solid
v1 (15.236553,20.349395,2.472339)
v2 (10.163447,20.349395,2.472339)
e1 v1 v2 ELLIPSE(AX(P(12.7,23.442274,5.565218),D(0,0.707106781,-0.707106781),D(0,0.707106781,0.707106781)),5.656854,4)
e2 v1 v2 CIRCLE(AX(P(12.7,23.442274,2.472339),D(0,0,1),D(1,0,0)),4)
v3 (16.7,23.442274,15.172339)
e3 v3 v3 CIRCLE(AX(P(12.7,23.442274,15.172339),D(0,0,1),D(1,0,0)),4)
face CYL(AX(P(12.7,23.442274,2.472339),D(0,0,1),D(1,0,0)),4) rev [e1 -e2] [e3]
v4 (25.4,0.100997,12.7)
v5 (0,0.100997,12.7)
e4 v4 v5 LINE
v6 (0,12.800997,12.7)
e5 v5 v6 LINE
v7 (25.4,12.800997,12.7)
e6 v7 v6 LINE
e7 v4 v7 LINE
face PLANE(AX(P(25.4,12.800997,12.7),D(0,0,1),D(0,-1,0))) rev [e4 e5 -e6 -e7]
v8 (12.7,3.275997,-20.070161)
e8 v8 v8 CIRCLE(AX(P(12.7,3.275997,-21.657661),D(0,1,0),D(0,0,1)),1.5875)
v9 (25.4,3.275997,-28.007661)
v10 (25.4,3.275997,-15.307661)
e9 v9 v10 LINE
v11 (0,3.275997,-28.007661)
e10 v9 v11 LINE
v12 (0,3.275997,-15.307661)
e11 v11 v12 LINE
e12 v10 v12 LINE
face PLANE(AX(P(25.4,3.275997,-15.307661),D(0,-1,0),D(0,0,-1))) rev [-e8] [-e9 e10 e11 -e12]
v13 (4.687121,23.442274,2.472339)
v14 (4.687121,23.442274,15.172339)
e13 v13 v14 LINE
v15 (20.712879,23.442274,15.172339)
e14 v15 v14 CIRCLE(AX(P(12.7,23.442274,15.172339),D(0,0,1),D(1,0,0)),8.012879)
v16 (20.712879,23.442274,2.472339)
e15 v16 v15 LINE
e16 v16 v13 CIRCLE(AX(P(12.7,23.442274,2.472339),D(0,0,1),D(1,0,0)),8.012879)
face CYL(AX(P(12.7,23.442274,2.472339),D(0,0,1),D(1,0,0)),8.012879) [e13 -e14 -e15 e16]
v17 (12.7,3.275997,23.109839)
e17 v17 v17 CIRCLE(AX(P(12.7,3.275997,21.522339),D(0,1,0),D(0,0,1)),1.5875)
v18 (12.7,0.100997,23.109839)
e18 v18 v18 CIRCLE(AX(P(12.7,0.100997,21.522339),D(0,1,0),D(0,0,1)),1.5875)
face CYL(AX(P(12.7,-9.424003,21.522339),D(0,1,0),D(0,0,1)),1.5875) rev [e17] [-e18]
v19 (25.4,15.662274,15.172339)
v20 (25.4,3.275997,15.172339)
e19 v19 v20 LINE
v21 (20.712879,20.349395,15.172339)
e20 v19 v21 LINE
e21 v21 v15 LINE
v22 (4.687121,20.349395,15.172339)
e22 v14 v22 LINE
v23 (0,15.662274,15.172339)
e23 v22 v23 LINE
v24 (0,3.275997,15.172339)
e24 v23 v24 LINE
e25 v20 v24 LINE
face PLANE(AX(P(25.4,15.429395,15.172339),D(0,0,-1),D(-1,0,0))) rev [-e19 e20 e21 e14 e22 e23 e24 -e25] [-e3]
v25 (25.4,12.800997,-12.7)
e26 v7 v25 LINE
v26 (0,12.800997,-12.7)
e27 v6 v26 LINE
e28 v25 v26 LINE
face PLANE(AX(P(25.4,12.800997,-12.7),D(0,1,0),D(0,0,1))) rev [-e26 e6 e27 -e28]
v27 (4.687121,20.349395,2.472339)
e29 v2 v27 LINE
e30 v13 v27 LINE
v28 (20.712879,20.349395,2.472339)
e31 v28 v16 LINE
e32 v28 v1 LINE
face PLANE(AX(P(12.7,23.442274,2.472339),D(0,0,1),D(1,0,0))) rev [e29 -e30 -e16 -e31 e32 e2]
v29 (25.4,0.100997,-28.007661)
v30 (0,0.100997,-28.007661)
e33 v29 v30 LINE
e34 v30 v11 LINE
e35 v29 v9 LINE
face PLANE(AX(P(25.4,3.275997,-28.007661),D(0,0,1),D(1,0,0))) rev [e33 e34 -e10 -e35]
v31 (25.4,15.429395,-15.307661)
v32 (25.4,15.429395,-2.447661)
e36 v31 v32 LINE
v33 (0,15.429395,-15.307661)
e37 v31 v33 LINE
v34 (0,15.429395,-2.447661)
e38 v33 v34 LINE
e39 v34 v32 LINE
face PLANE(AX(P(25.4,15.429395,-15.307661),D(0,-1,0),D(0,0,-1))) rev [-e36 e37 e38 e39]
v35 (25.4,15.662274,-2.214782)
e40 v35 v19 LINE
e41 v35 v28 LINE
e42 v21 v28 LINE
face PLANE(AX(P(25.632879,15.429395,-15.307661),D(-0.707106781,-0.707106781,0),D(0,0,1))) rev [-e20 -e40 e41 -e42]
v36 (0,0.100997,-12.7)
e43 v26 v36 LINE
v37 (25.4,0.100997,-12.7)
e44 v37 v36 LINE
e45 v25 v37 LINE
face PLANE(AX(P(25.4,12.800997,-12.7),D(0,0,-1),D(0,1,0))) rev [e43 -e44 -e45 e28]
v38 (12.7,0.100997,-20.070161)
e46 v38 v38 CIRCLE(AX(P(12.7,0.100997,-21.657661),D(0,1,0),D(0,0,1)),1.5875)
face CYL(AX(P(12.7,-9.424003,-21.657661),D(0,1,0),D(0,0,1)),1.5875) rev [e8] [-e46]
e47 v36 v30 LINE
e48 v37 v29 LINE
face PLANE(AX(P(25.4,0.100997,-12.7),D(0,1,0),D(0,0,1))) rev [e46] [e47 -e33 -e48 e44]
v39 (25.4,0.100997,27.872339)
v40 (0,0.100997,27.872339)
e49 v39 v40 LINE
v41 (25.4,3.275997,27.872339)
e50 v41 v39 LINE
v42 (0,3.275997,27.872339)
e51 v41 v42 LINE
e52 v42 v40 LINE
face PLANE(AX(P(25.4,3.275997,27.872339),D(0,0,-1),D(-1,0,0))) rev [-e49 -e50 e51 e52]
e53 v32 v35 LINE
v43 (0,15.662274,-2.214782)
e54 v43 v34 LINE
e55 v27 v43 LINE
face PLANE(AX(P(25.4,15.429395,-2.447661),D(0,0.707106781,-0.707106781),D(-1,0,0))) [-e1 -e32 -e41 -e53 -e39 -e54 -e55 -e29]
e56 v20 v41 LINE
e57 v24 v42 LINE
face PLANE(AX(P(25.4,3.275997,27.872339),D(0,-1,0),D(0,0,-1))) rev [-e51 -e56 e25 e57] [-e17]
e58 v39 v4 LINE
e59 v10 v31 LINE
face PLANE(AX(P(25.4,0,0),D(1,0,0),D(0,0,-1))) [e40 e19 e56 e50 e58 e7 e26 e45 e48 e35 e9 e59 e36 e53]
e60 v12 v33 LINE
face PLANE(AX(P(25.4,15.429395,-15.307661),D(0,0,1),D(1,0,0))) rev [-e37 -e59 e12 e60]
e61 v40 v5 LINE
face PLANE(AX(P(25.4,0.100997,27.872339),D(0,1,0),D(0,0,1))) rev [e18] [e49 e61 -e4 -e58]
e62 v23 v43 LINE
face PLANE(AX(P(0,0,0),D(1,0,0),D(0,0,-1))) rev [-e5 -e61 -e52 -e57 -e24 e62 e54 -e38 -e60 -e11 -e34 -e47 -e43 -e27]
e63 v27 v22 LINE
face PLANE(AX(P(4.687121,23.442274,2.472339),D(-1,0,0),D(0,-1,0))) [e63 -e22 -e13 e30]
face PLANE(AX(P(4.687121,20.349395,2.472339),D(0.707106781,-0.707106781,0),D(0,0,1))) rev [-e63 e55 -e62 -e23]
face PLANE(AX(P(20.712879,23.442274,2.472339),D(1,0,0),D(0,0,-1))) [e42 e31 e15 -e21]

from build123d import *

# Parameters (mm, degrees)
BOSS_EXTRUDE1_DEPTH = 25.4
SKETCH2_R           = 4
BOSS_EXTRUDE2_DEPTH = 12.7
CHAMFER1_SIZE       = 4.92
CHAMFER2_SIZE       = 4.92
SKETCH3_R           = 1.5875
CUT_EXTRUDE1_DEPTH  = 12.7


with BuildPart() as part:
    # Sketch1 → Boss-Extrude1 (new body)
    with BuildSketch(Plane(origin=(0, 0, 0), x_dir=(0, 0, -1), z_dir=(1, 0, 0))):
        Polygon((12.7, 12.800996681), (-12.7, 12.800996681), (-12.7, 0.100996681), (-27.872338694, 0.100996681), (-27.872338694, 3.275996681), (-15.172338694, 3.275996681), (-15.172338694, 15.4293954), (15.307661306, 15.4293954), (15.307661306, 3.275996681), (28.007661306, 3.275996681), (28.007661306, 0.100996681), (12.7, 0.100996681), align=None)
    extrude(amount=BOSS_EXTRUDE1_DEPTH)

    # Sketch2 → Boss-Extrude2 (add)
    with BuildSketch(Plane.XY.offset(15.172338694)):
        with BuildLine():
            Line((4.687120924, 23.442274476), (4.687120924, 15.4293954))
            Line((4.687120924, 15.4293954), (20.712879076, 15.4293954))
            Line((20.712879076, 15.4293954), (20.712879076, 23.442274476))
            ThreePointArc((20.712879076, 23.442274476), (12.7, 31.455153552), (4.687120924, 23.442274476))
        make_face()
        with Locations((12.7, 23.442274476)):
            Circle(SKETCH2_R, mode=Mode.SUBTRACT)
    extrude(amount=-BOSS_EXTRUDE2_DEPTH)

    # Chamfer1
    # the kernel refuses this chamfer: 4.92 mm, written as the material it adds along each edge
    with BuildSketch(Plane(origin=(4.687120924, 15.4293954, 15.172338694), x_dir=(-0.9996219169112966, -0.027495876610586726, 0), z_dir=(0, 0, -1))) as chamfer1_piece_1_section:
        Polygon((CHAMFER1_SIZE * 0.999621916911, CHAMFER1_SIZE * 0.0274958766106), (-CHAMFER1_SIZE * 0.0274958766106, CHAMFER1_SIZE * 0.999621916911), (0, 0), align=None)
    chamfer1_piece_1 = extrude(amount=12.7, mode=Mode.PRIVATE)
    chamfer1_piece_1 = split(chamfer1_piece_1, bisect_by=Plane(origin=(0, 17.064795435, 8.822338694), z_dir=(1, 0, 0)), keep=Keep.TOP, mode=Mode.PRIVATE)
    add(chamfer1_piece_1)
    with BuildSketch(Plane(origin=(20.712879076, 15.4293954, 15.172338694), x_dir=(0.9996219169112966, -0.02749587661058674, 0), z_dir=(0, 0, -1))) as chamfer1_piece_2_section:
        Polygon((CHAMFER1_SIZE * 0.999621916911, -CHAMFER1_SIZE * 0.0274958766106), (-CHAMFER1_SIZE * 0.0274958766106, -CHAMFER1_SIZE * 0.999621916911), (0, 0), align=None)
    chamfer1_piece_2 = extrude(amount=12.7, mode=Mode.PRIVATE)
    chamfer1_piece_2 = split(chamfer1_piece_2, bisect_by=Plane(origin=(25.4, 17.064795435, 8.822338694), z_dir=(-1, 0, 0)), keep=Keep.TOP, mode=Mode.PRIVATE)
    add(chamfer1_piece_2)

    # Chamfer2
    # the kernel refuses this chamfer: 4.92 mm, written as the material it adds along each edge
    with BuildSketch(Plane(origin=(25.4, 15.4293954, 2.472338694), x_dir=(0, -0.02749587661026744, -0.9996219169113054), z_dir=(-1, 0, 0))) as chamfer2_piece_1_section:
        Polygon((CHAMFER2_SIZE * 0.999621916911, -CHAMFER2_SIZE * 0.0274958766106), (-CHAMFER2_SIZE * 0.0274958766103, -CHAMFER2_SIZE * 0.999621916911), (0, 0), align=None)
    chamfer2_piece_1 = extrude(amount=25.4, mode=Mode.PRIVATE)
    chamfer2_piece_1 = split(chamfer2_piece_1, bisect_by=Plane(origin=(23.520525821, 17.541748655, 0.607229555), z_dir=(-0.7071067811868302, -0.7071067811862649, 0)), keep=Keep.TOP, mode=Mode.PRIVATE)
    chamfer2_piece_1 = split(chamfer2_piece_1, bisect_by=Plane(origin=(20.712879076, 16.594460185, 0.607229555), z_dir=(1, 0, 0)), keep=Keep.TOP, mode=Mode.PRIVATE)
    add(chamfer2_piece_1)
    with BuildSketch(Plane(origin=(25.4, 15.4293954, 2.472338694), x_dir=(0, -0.02749587661026744, -0.9996219169113054), z_dir=(-1, 0, 0))) as chamfer2_piece_2_section:
        Polygon((CHAMFER2_SIZE * 0.999621916911, -CHAMFER2_SIZE * 0.0274958766106), (-CHAMFER2_SIZE * 0.0274958766103, -CHAMFER2_SIZE * 0.999621916911), (0, 0), align=None)
    chamfer2_piece_2 = extrude(amount=25.4, mode=Mode.PRIVATE)
    chamfer2_piece_2 = split(chamfer2_piece_2, bisect_by=Plane(origin=(7.03196097, 22.694235446, 0.836220955), z_dir=(0.7071067811868302, -0.7071067811862649, 0)), keep=Keep.TOP, mode=Mode.PRIVATE)
    chamfer2_piece_2 = split(chamfer2_piece_2, bisect_by=Plane(origin=(4.687120924, 17.026196416, 0.836220955), z_dir=(1, 0, 0)), keep=Keep.TOP, mode=Mode.PRIVATE)
    chamfer2_piece_2 = split(chamfer2_piece_2, bisect_by=Plane(origin=(20.712879076, 17.026196416, 0.836220955), z_dir=(-1, 0, 0)), keep=Keep.TOP, mode=Mode.PRIVATE)
    chamfer2_piece_2 = chamfer2_piece_2 - Plane(origin=(12.7, 23.442274476, 0.836220955), x_dir=(1, 0, 0), z_dir=(0, 0, 1)) * Cylinder(4, 71, mode=Mode.PRIVATE)
    add(chamfer2_piece_2)
    with BuildSketch(Plane(origin=(25.4, 15.4293954, 2.472338694), x_dir=(0, -0.02749587661026744, -0.9996219169113054), z_dir=(-1, 0, 0))) as chamfer2_piece_3_section:
        Polygon((CHAMFER2_SIZE * 0.999621916911, -CHAMFER2_SIZE * 0.0274958766106), (-CHAMFER2_SIZE * 0.0274958766103, -CHAMFER2_SIZE * 0.999621916911), (0, 0), align=None)
    chamfer2_piece_3 = extrude(amount=25.4, mode=Mode.PRIVATE)
    chamfer2_piece_3 = split(chamfer2_piece_3, bisect_by=Plane(origin=(1.879474179, 17.541748655, 0.607229555), z_dir=(0.7071067811868302, -0.7071067811862649, 0)), keep=Keep.TOP, mode=Mode.PRIVATE)
    chamfer2_piece_3 = split(chamfer2_piece_3, bisect_by=Plane(origin=(4.687120924, 16.594460185, 0.607229555), z_dir=(-1, 0, 0)), keep=Keep.TOP, mode=Mode.PRIVATE)
    add(chamfer2_piece_3)

    # Sketch3 → Cut-Extrude1 (cut)
    with BuildSketch(Plane(origin=(0, 3.275996681, 0), x_dir=(1, 0, 0), z_dir=(0, 1, 0))):
        with Locations(Location((12.7, 21.657661306, 0), (0, 0, 270))):
            Circle(SKETCH3_R)
        with Locations(Location((12.7, -21.522338694, 0), (0, 0, 270))):
            Circle(SKETCH3_R)
    extrude(amount=-CUT_EXTRUDE1_DEPTH, mode=Mode.SUBTRACT)


solid = part.part
